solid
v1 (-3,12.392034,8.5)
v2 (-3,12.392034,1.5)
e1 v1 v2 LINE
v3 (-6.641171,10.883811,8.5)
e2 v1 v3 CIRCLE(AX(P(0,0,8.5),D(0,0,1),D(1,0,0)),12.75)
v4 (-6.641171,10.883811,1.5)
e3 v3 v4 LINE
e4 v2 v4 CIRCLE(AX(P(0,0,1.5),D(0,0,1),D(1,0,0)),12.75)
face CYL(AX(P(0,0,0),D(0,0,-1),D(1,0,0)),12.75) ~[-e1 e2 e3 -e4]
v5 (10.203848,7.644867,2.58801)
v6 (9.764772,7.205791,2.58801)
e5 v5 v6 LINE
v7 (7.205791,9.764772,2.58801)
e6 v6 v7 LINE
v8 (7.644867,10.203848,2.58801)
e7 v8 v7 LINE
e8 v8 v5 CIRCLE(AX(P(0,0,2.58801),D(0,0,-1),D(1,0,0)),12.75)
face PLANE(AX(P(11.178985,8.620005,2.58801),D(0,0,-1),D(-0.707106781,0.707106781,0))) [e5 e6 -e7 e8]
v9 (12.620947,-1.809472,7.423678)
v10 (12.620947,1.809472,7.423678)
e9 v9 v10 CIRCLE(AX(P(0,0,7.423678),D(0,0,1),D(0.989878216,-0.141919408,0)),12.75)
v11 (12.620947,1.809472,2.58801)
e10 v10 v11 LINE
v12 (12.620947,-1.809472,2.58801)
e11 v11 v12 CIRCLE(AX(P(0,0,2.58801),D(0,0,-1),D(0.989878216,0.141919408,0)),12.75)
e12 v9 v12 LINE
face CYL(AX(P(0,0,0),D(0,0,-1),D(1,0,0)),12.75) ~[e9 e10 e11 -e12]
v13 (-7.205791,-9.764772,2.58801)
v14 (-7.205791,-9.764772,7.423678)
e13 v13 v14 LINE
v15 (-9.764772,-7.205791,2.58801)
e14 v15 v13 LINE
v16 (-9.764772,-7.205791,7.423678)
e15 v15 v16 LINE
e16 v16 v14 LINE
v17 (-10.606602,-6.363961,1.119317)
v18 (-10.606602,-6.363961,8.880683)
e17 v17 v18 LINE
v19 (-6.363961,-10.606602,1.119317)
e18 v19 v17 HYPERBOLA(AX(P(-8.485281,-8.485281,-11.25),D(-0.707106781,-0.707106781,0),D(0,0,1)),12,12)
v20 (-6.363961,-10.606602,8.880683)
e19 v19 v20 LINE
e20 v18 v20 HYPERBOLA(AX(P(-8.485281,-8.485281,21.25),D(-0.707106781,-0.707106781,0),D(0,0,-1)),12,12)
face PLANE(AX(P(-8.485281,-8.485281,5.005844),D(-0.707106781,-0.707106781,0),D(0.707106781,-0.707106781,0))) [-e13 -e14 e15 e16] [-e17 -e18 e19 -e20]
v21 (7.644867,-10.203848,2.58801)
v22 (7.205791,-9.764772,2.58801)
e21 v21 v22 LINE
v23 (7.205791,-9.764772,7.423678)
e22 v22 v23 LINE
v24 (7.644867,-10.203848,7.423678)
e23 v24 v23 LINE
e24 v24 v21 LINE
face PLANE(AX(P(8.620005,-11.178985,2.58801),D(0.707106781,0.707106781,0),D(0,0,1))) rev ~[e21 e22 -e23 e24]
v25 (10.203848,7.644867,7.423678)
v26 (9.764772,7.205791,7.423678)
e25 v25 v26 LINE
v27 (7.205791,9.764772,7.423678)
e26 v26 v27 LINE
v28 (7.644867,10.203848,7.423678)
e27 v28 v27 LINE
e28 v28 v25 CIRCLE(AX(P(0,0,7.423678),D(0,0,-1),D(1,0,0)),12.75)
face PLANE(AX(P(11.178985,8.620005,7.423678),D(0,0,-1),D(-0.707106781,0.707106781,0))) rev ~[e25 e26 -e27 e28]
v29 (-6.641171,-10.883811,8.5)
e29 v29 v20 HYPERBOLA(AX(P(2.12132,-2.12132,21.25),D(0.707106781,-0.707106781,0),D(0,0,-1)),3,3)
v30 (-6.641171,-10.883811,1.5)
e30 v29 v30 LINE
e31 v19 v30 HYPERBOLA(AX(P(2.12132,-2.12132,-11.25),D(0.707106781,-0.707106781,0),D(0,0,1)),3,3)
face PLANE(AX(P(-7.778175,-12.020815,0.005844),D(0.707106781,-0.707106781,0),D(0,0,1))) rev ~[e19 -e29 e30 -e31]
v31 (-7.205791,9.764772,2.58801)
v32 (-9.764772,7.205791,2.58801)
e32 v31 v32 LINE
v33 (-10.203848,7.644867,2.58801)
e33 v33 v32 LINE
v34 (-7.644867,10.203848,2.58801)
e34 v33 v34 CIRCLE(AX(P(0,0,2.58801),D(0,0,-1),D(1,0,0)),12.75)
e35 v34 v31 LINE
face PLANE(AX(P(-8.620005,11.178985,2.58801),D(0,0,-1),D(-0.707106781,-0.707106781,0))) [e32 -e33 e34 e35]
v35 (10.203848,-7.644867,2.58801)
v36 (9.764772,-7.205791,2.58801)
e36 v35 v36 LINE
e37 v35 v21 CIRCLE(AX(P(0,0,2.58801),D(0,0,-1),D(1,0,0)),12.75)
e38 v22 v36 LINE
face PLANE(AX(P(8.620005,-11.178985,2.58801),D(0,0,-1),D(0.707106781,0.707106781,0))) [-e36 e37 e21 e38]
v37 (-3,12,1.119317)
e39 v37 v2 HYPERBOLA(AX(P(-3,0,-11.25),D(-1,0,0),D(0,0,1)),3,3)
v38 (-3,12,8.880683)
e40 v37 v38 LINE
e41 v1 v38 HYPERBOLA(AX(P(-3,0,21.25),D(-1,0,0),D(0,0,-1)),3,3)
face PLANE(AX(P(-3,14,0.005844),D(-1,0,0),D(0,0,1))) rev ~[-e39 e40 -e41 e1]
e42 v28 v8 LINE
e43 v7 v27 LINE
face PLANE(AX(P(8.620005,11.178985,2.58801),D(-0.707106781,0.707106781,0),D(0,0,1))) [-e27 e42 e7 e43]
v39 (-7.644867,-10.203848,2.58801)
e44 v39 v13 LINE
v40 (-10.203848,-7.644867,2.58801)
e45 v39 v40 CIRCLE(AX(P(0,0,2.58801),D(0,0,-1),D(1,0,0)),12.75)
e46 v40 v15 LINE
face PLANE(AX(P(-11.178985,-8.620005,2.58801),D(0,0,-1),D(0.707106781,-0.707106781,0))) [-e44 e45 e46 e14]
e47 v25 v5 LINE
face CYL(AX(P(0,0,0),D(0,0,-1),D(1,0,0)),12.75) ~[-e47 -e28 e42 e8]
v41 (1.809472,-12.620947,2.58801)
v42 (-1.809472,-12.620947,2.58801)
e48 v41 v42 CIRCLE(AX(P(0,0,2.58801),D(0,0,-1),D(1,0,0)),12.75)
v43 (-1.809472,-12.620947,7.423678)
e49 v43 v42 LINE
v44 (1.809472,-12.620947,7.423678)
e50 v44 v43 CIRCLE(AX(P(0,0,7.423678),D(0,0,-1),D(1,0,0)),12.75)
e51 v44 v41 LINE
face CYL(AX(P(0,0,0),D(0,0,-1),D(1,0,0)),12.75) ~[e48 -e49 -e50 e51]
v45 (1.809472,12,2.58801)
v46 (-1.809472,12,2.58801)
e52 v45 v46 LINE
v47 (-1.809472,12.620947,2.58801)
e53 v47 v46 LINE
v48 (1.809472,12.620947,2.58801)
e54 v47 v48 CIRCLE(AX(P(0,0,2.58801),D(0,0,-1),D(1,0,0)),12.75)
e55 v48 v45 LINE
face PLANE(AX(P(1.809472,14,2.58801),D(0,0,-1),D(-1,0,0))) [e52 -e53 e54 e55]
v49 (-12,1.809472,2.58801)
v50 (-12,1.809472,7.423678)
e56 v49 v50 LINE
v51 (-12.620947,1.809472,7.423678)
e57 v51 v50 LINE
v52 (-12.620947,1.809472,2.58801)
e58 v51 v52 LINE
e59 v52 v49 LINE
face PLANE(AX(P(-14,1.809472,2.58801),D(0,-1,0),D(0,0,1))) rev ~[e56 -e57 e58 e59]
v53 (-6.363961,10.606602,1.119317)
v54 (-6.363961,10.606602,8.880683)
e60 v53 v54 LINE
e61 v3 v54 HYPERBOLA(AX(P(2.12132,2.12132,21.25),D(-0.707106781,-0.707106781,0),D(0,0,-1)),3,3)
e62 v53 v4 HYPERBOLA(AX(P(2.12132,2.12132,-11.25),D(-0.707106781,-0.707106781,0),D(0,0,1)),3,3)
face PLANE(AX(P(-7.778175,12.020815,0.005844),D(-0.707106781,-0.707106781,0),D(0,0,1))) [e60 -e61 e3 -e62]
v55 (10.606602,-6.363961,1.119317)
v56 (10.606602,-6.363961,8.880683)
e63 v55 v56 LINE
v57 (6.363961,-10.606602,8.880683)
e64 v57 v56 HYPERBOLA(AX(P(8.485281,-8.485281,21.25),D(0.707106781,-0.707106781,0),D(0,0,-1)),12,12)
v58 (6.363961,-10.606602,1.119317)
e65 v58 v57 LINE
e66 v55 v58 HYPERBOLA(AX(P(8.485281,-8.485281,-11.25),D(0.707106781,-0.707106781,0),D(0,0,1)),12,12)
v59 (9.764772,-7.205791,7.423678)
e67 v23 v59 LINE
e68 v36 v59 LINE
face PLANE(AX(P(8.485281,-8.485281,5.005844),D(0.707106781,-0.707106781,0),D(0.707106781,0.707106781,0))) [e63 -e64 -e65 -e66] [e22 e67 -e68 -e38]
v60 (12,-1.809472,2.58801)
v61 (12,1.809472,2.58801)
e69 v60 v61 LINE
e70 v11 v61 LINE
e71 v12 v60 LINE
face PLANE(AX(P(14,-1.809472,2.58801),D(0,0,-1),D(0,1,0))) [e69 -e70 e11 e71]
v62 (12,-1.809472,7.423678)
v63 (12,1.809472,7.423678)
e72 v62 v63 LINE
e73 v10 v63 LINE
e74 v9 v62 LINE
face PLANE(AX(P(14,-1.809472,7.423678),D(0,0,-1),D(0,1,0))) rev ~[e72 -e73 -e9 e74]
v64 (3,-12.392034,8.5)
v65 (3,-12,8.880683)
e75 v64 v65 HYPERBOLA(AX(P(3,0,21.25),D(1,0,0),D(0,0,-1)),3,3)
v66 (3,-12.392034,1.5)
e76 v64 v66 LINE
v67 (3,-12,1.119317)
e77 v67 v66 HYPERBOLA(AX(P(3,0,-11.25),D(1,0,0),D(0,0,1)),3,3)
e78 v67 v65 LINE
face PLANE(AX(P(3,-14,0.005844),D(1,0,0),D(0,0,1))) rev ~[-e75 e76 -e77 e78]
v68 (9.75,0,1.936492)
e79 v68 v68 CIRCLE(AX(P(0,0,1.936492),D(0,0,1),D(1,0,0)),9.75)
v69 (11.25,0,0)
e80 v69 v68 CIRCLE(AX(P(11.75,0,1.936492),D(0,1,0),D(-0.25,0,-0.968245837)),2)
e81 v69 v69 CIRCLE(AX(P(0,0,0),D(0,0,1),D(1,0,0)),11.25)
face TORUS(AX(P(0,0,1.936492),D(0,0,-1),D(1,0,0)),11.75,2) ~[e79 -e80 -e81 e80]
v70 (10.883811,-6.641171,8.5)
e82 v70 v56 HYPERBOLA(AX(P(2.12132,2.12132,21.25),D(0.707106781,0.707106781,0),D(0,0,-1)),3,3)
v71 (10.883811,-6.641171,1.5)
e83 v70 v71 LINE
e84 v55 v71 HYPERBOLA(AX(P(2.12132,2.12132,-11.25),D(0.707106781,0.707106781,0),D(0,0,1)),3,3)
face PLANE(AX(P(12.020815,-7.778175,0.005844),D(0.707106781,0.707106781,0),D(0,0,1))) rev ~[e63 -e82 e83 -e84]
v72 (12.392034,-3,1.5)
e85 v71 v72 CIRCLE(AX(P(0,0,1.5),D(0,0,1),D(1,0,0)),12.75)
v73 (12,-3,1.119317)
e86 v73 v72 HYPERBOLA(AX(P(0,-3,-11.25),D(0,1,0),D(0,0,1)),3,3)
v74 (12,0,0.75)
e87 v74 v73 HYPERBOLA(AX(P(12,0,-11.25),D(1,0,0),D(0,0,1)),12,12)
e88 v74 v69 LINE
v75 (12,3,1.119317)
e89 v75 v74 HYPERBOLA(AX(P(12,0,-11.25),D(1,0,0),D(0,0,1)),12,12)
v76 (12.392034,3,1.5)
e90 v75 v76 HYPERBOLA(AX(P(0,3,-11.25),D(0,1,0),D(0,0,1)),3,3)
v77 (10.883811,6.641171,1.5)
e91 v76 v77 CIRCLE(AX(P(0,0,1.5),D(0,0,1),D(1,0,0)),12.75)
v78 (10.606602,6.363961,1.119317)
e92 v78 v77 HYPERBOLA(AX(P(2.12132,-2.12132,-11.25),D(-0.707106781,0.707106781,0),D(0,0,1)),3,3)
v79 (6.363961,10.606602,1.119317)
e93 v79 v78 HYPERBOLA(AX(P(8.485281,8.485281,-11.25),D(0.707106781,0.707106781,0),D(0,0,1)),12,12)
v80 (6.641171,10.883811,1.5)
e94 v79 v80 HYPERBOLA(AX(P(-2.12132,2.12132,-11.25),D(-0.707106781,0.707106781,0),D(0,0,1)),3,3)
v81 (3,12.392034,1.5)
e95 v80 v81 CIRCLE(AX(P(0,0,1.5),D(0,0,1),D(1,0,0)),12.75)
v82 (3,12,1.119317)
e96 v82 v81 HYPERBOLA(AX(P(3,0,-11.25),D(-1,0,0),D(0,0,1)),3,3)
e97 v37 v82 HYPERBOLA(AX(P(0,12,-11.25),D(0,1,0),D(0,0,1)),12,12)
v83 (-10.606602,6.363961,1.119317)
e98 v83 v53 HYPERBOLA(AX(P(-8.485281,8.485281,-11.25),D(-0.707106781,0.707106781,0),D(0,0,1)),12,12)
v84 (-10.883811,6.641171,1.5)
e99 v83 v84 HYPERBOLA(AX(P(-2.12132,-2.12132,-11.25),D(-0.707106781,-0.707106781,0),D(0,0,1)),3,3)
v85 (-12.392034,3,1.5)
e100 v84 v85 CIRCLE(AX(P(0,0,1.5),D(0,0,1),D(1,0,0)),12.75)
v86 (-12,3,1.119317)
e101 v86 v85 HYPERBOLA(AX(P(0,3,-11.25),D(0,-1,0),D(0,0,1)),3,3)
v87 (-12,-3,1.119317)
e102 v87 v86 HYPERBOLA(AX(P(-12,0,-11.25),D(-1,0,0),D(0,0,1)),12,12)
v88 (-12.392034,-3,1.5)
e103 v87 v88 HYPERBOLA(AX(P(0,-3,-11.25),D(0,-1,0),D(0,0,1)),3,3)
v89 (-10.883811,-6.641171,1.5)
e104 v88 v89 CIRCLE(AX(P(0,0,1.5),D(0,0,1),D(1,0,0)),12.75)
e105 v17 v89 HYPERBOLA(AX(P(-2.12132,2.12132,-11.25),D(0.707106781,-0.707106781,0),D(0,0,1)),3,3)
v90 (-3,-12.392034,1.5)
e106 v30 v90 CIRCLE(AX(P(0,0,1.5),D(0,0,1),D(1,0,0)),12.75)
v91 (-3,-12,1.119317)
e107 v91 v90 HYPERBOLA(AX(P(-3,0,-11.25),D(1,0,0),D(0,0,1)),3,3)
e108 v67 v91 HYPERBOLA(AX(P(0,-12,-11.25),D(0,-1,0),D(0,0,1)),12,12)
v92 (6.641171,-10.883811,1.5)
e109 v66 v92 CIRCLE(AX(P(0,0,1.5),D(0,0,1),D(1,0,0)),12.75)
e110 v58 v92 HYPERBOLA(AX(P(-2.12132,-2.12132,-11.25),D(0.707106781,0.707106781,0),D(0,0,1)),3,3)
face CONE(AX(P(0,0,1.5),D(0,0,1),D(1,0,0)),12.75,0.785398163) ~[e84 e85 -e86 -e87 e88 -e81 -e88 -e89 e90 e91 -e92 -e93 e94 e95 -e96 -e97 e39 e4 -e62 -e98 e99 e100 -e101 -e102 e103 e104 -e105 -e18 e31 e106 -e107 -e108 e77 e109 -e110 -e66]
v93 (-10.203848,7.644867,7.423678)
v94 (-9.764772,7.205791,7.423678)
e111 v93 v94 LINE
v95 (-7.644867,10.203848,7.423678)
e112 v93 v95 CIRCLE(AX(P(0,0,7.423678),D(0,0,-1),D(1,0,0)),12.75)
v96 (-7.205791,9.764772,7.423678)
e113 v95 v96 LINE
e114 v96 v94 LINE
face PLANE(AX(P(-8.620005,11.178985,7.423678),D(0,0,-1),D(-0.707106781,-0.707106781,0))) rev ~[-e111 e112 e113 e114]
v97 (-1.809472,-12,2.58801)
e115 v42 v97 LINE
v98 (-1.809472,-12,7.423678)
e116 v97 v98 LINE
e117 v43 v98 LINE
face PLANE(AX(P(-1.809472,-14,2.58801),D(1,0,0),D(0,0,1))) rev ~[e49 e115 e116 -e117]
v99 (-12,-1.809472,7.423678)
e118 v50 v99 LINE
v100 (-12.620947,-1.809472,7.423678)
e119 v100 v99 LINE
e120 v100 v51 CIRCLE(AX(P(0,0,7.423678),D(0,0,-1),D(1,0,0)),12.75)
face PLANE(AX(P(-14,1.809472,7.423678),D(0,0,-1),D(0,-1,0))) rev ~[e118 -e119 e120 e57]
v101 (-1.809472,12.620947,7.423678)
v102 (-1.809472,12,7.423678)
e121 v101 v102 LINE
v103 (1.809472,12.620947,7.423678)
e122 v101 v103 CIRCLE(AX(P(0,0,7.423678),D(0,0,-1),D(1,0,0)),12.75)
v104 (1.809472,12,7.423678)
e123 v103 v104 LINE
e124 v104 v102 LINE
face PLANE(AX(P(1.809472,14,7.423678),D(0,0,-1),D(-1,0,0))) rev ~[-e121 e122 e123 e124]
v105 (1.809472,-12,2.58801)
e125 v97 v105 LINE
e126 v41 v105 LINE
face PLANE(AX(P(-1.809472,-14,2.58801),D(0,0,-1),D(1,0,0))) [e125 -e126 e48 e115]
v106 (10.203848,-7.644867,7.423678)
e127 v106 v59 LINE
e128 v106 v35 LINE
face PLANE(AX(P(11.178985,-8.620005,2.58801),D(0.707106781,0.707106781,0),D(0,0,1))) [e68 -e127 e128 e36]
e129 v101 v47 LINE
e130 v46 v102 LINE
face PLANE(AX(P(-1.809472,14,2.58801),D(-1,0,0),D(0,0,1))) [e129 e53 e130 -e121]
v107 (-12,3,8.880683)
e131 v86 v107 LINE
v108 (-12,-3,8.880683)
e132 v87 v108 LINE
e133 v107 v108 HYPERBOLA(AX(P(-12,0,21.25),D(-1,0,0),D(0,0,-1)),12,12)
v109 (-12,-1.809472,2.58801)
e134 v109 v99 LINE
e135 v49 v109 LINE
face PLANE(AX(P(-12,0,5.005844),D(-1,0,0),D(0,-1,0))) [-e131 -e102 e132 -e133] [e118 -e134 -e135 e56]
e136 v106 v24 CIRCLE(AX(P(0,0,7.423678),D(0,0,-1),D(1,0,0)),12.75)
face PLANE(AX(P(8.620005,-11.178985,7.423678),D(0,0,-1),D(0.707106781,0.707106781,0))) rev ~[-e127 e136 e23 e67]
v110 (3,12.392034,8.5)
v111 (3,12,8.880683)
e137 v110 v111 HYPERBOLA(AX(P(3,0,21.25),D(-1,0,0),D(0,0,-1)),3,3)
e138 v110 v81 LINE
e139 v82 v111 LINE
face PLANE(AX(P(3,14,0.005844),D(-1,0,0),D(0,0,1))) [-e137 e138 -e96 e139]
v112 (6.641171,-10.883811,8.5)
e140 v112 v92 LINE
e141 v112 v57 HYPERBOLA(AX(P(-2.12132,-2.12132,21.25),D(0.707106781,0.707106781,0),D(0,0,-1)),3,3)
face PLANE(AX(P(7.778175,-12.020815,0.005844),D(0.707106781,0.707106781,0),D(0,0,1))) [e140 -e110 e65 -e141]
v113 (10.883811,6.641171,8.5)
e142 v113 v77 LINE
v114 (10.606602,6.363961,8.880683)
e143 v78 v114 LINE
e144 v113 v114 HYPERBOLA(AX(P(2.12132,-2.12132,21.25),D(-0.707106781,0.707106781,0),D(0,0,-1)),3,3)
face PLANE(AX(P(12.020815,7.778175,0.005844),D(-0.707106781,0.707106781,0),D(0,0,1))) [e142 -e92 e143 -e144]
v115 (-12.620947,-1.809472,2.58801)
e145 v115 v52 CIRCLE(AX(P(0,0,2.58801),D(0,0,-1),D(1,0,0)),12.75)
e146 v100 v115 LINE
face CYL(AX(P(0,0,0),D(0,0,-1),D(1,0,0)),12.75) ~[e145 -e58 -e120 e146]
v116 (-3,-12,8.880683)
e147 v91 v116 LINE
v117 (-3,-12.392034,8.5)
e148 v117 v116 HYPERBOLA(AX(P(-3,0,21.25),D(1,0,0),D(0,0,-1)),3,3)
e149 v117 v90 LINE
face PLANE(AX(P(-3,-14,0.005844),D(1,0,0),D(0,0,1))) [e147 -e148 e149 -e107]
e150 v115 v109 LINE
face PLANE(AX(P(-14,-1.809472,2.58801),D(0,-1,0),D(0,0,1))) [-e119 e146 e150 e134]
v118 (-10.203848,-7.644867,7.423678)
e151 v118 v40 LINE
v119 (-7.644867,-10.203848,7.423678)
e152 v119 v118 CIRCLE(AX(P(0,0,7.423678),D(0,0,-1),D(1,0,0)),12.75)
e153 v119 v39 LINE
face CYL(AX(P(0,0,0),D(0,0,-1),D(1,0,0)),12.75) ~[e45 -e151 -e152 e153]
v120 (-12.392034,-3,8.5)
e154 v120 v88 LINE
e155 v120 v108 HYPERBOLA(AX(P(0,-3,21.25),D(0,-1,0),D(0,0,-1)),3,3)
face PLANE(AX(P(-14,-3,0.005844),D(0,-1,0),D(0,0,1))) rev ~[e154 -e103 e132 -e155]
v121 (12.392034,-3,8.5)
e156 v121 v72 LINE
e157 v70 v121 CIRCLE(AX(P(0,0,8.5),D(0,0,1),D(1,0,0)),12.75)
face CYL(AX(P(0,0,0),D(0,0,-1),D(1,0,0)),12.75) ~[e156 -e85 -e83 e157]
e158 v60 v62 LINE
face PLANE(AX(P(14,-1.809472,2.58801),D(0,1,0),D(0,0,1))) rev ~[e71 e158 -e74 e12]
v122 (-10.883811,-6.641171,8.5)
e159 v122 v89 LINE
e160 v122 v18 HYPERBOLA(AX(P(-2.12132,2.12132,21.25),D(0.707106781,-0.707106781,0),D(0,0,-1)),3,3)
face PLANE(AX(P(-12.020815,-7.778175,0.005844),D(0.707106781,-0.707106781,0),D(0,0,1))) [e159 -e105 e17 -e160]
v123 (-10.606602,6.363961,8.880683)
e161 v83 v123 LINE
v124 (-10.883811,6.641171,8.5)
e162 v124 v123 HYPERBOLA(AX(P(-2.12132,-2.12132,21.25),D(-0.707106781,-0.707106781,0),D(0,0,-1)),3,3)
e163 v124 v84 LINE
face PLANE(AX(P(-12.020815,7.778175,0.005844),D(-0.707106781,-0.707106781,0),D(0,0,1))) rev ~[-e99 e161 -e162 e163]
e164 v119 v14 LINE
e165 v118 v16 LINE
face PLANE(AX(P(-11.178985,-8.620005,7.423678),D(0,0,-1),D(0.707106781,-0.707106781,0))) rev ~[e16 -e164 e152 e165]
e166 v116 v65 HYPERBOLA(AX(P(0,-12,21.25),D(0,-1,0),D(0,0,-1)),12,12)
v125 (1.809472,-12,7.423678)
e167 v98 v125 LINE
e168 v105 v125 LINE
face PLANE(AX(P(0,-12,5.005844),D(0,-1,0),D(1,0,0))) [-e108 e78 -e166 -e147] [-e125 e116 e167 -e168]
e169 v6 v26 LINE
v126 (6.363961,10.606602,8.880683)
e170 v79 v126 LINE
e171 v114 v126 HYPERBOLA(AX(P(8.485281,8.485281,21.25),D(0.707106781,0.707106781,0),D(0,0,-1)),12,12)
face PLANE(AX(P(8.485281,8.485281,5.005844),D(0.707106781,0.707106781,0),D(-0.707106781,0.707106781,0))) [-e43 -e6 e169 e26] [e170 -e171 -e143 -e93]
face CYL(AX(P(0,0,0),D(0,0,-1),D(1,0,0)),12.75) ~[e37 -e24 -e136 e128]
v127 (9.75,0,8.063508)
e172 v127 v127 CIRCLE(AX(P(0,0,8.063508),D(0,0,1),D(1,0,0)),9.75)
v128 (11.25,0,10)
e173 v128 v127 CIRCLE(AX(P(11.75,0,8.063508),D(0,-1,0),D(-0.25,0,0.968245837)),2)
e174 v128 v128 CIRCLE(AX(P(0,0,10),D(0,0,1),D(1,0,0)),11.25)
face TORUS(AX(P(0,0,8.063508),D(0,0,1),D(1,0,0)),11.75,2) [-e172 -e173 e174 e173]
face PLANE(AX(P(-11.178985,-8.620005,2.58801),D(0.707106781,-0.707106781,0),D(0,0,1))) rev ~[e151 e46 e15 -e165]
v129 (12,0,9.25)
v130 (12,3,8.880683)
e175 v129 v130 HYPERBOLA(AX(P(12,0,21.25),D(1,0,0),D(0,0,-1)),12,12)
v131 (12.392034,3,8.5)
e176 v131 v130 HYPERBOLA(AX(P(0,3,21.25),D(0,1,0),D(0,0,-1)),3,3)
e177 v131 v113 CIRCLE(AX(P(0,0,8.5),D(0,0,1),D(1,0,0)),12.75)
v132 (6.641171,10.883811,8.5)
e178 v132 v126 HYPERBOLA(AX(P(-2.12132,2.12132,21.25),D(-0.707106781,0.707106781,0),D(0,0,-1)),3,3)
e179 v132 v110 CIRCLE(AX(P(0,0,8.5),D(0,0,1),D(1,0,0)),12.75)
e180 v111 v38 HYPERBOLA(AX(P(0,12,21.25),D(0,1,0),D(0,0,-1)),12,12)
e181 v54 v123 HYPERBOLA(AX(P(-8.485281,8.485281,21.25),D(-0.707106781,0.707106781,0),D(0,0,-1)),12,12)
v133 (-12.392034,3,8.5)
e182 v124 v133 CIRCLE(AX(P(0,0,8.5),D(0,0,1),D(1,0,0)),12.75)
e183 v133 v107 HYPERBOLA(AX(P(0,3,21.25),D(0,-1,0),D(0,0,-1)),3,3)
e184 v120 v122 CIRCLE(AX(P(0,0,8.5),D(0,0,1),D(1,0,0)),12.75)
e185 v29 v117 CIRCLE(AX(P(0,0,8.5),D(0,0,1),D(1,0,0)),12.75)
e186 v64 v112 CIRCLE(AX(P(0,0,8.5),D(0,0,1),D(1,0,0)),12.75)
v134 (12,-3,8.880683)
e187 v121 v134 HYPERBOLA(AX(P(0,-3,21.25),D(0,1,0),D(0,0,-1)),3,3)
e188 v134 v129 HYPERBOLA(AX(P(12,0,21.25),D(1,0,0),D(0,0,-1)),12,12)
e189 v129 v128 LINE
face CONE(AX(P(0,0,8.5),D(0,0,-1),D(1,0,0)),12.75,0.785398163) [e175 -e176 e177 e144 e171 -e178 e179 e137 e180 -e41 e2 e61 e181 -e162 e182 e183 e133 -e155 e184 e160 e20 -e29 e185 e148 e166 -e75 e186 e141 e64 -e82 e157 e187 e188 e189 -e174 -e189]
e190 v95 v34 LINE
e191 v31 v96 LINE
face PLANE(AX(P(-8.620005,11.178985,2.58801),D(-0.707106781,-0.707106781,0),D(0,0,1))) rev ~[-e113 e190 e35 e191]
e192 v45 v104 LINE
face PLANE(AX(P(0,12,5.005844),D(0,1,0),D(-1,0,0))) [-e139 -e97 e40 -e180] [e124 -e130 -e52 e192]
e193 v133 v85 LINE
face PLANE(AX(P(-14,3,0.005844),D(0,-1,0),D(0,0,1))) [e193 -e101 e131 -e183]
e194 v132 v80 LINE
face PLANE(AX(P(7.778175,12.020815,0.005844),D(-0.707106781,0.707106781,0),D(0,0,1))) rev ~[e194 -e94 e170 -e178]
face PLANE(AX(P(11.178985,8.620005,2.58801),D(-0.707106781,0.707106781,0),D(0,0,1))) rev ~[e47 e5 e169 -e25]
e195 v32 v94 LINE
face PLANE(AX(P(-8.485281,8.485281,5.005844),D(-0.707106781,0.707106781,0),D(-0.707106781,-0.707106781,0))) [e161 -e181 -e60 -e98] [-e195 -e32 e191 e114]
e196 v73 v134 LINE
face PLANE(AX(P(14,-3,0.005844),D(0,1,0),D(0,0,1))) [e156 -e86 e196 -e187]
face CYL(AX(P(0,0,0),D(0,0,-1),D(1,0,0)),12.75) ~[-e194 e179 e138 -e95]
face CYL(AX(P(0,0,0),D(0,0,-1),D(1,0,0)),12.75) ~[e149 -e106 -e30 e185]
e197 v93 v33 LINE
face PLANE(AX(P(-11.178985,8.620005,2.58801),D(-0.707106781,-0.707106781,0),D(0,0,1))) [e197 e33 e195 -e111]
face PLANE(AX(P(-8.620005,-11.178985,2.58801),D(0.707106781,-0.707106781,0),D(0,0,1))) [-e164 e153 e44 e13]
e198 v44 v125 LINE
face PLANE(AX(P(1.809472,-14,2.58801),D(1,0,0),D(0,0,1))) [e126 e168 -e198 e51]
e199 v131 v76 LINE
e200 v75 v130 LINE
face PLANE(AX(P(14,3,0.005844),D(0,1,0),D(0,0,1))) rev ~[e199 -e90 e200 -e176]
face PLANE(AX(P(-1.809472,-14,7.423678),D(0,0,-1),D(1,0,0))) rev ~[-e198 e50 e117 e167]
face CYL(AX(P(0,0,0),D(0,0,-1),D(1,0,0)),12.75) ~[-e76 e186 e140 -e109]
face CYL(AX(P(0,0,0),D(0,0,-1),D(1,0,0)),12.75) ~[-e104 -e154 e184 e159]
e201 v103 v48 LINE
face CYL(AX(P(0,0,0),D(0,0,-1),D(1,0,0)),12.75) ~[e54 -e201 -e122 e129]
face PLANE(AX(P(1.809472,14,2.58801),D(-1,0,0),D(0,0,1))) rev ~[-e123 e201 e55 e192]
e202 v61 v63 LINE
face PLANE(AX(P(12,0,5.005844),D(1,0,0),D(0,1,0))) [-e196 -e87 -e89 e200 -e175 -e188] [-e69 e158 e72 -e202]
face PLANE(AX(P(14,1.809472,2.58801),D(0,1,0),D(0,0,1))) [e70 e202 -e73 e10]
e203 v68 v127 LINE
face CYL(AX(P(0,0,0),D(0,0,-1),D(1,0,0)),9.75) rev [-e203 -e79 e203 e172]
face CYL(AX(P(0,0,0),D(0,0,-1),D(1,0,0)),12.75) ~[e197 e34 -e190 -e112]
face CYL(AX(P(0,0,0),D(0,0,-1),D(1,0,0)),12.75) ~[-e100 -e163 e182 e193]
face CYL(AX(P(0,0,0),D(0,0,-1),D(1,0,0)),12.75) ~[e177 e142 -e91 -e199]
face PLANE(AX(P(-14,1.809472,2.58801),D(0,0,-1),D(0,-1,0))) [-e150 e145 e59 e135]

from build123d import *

# Parameters (mm, degrees)
F0_R            = 12.75
F0_R_2          = 9.75
F1_DEPTH        = 10
F2_SIZE         = 1.5
F4_W            = 6
F4_H            = 10
F4_W_2          = 3.618944902
F4_H_2          = 4.83566802
F5_DEPTH        = 2
F5_COPIES_COUNT = 8


# Not quite as in the source:
# - a fillet or chamfer that OpenCascade refuses, or shapes differently, is made with other operations: its cross-section is extruded or revolved along the edge and cut away or added
# - a pattern or mirror of a feature is missing from the dataset's text; its kind, count and spacing are read off the source's solid


with BuildPart() as f1:
    # F0 (on Top) → F1 (new body)
    with BuildSketch(Plane.XY):
        Circle(F0_R)
        Circle(F0_R_2, mode=Mode.SUBTRACT)
    extrude(amount=F1_DEPTH)

    # F2
    f2_edges = [f1.edges().sort_by_distance(p)[0] for p in [
        (-12.75, 0, 10),
        (-12.75, 0, 0),
    ]]
    chamfer(f2_edges, length=F2_SIZE)

    # F4 (on offset) → F5 (cut)
    with BuildSketch(Plane.YZ.offset(14)):
        with Locations((0, 5.0058439374)):
            Rectangle(F4_W, F4_H)
        with Locations((0, 5.0058439374)):
            Rectangle(F4_W_2, F4_H_2, mode=Mode.SUBTRACT)
    f5 = extrude(amount=-F5_DEPTH, mode=Mode.SUBTRACT)

    # F5_copies: F5 ×8 about axis
    f5_copies_axis = Axis((0, 0, 0), (0, 0, 1))
    for i in range(1, F5_COPIES_COUNT):
        add(f5.rotate(f5_copies_axis, i * 360 / F5_COPIES_COUNT), mode=Mode.SUBTRACT)

    # F6: fillet of radius 2 on 2 edges, made by hand

    # F6_s1 → F6_t2 (revolve, cut)
    with BuildSketch(Plane.XZ):
        with BuildLine():
            ThreePointArc((11.25, 10), (10.1688611699, 9.2882531983), (9.75, 8.0635083269))
            Line((9.75, 8.0635083269), (9.75, 10))
            Line((9.75, 10), (11.25, 10))
        make_face()
    revolve(axis=Axis((0, 0, 10), (0, 0, 1)), mode=Mode.SUBTRACT)

    # F6_s3 → F6_t4 (revolve, cut)
    with BuildSketch(Plane.XZ):
        with BuildLine():
            ThreePointArc((11.25, 0), (10.1688611699, 0.7117468017), (9.75, 1.9364916731))
            Line((9.75, 1.9364916731), (9.75, 0))
            Line((9.75, 0), (11.25, 0))
        make_face()
    revolve(axis=Axis((0, 0, 0), (0, 0, 1)), mode=Mode.SUBTRACT)


solid = f1.part
